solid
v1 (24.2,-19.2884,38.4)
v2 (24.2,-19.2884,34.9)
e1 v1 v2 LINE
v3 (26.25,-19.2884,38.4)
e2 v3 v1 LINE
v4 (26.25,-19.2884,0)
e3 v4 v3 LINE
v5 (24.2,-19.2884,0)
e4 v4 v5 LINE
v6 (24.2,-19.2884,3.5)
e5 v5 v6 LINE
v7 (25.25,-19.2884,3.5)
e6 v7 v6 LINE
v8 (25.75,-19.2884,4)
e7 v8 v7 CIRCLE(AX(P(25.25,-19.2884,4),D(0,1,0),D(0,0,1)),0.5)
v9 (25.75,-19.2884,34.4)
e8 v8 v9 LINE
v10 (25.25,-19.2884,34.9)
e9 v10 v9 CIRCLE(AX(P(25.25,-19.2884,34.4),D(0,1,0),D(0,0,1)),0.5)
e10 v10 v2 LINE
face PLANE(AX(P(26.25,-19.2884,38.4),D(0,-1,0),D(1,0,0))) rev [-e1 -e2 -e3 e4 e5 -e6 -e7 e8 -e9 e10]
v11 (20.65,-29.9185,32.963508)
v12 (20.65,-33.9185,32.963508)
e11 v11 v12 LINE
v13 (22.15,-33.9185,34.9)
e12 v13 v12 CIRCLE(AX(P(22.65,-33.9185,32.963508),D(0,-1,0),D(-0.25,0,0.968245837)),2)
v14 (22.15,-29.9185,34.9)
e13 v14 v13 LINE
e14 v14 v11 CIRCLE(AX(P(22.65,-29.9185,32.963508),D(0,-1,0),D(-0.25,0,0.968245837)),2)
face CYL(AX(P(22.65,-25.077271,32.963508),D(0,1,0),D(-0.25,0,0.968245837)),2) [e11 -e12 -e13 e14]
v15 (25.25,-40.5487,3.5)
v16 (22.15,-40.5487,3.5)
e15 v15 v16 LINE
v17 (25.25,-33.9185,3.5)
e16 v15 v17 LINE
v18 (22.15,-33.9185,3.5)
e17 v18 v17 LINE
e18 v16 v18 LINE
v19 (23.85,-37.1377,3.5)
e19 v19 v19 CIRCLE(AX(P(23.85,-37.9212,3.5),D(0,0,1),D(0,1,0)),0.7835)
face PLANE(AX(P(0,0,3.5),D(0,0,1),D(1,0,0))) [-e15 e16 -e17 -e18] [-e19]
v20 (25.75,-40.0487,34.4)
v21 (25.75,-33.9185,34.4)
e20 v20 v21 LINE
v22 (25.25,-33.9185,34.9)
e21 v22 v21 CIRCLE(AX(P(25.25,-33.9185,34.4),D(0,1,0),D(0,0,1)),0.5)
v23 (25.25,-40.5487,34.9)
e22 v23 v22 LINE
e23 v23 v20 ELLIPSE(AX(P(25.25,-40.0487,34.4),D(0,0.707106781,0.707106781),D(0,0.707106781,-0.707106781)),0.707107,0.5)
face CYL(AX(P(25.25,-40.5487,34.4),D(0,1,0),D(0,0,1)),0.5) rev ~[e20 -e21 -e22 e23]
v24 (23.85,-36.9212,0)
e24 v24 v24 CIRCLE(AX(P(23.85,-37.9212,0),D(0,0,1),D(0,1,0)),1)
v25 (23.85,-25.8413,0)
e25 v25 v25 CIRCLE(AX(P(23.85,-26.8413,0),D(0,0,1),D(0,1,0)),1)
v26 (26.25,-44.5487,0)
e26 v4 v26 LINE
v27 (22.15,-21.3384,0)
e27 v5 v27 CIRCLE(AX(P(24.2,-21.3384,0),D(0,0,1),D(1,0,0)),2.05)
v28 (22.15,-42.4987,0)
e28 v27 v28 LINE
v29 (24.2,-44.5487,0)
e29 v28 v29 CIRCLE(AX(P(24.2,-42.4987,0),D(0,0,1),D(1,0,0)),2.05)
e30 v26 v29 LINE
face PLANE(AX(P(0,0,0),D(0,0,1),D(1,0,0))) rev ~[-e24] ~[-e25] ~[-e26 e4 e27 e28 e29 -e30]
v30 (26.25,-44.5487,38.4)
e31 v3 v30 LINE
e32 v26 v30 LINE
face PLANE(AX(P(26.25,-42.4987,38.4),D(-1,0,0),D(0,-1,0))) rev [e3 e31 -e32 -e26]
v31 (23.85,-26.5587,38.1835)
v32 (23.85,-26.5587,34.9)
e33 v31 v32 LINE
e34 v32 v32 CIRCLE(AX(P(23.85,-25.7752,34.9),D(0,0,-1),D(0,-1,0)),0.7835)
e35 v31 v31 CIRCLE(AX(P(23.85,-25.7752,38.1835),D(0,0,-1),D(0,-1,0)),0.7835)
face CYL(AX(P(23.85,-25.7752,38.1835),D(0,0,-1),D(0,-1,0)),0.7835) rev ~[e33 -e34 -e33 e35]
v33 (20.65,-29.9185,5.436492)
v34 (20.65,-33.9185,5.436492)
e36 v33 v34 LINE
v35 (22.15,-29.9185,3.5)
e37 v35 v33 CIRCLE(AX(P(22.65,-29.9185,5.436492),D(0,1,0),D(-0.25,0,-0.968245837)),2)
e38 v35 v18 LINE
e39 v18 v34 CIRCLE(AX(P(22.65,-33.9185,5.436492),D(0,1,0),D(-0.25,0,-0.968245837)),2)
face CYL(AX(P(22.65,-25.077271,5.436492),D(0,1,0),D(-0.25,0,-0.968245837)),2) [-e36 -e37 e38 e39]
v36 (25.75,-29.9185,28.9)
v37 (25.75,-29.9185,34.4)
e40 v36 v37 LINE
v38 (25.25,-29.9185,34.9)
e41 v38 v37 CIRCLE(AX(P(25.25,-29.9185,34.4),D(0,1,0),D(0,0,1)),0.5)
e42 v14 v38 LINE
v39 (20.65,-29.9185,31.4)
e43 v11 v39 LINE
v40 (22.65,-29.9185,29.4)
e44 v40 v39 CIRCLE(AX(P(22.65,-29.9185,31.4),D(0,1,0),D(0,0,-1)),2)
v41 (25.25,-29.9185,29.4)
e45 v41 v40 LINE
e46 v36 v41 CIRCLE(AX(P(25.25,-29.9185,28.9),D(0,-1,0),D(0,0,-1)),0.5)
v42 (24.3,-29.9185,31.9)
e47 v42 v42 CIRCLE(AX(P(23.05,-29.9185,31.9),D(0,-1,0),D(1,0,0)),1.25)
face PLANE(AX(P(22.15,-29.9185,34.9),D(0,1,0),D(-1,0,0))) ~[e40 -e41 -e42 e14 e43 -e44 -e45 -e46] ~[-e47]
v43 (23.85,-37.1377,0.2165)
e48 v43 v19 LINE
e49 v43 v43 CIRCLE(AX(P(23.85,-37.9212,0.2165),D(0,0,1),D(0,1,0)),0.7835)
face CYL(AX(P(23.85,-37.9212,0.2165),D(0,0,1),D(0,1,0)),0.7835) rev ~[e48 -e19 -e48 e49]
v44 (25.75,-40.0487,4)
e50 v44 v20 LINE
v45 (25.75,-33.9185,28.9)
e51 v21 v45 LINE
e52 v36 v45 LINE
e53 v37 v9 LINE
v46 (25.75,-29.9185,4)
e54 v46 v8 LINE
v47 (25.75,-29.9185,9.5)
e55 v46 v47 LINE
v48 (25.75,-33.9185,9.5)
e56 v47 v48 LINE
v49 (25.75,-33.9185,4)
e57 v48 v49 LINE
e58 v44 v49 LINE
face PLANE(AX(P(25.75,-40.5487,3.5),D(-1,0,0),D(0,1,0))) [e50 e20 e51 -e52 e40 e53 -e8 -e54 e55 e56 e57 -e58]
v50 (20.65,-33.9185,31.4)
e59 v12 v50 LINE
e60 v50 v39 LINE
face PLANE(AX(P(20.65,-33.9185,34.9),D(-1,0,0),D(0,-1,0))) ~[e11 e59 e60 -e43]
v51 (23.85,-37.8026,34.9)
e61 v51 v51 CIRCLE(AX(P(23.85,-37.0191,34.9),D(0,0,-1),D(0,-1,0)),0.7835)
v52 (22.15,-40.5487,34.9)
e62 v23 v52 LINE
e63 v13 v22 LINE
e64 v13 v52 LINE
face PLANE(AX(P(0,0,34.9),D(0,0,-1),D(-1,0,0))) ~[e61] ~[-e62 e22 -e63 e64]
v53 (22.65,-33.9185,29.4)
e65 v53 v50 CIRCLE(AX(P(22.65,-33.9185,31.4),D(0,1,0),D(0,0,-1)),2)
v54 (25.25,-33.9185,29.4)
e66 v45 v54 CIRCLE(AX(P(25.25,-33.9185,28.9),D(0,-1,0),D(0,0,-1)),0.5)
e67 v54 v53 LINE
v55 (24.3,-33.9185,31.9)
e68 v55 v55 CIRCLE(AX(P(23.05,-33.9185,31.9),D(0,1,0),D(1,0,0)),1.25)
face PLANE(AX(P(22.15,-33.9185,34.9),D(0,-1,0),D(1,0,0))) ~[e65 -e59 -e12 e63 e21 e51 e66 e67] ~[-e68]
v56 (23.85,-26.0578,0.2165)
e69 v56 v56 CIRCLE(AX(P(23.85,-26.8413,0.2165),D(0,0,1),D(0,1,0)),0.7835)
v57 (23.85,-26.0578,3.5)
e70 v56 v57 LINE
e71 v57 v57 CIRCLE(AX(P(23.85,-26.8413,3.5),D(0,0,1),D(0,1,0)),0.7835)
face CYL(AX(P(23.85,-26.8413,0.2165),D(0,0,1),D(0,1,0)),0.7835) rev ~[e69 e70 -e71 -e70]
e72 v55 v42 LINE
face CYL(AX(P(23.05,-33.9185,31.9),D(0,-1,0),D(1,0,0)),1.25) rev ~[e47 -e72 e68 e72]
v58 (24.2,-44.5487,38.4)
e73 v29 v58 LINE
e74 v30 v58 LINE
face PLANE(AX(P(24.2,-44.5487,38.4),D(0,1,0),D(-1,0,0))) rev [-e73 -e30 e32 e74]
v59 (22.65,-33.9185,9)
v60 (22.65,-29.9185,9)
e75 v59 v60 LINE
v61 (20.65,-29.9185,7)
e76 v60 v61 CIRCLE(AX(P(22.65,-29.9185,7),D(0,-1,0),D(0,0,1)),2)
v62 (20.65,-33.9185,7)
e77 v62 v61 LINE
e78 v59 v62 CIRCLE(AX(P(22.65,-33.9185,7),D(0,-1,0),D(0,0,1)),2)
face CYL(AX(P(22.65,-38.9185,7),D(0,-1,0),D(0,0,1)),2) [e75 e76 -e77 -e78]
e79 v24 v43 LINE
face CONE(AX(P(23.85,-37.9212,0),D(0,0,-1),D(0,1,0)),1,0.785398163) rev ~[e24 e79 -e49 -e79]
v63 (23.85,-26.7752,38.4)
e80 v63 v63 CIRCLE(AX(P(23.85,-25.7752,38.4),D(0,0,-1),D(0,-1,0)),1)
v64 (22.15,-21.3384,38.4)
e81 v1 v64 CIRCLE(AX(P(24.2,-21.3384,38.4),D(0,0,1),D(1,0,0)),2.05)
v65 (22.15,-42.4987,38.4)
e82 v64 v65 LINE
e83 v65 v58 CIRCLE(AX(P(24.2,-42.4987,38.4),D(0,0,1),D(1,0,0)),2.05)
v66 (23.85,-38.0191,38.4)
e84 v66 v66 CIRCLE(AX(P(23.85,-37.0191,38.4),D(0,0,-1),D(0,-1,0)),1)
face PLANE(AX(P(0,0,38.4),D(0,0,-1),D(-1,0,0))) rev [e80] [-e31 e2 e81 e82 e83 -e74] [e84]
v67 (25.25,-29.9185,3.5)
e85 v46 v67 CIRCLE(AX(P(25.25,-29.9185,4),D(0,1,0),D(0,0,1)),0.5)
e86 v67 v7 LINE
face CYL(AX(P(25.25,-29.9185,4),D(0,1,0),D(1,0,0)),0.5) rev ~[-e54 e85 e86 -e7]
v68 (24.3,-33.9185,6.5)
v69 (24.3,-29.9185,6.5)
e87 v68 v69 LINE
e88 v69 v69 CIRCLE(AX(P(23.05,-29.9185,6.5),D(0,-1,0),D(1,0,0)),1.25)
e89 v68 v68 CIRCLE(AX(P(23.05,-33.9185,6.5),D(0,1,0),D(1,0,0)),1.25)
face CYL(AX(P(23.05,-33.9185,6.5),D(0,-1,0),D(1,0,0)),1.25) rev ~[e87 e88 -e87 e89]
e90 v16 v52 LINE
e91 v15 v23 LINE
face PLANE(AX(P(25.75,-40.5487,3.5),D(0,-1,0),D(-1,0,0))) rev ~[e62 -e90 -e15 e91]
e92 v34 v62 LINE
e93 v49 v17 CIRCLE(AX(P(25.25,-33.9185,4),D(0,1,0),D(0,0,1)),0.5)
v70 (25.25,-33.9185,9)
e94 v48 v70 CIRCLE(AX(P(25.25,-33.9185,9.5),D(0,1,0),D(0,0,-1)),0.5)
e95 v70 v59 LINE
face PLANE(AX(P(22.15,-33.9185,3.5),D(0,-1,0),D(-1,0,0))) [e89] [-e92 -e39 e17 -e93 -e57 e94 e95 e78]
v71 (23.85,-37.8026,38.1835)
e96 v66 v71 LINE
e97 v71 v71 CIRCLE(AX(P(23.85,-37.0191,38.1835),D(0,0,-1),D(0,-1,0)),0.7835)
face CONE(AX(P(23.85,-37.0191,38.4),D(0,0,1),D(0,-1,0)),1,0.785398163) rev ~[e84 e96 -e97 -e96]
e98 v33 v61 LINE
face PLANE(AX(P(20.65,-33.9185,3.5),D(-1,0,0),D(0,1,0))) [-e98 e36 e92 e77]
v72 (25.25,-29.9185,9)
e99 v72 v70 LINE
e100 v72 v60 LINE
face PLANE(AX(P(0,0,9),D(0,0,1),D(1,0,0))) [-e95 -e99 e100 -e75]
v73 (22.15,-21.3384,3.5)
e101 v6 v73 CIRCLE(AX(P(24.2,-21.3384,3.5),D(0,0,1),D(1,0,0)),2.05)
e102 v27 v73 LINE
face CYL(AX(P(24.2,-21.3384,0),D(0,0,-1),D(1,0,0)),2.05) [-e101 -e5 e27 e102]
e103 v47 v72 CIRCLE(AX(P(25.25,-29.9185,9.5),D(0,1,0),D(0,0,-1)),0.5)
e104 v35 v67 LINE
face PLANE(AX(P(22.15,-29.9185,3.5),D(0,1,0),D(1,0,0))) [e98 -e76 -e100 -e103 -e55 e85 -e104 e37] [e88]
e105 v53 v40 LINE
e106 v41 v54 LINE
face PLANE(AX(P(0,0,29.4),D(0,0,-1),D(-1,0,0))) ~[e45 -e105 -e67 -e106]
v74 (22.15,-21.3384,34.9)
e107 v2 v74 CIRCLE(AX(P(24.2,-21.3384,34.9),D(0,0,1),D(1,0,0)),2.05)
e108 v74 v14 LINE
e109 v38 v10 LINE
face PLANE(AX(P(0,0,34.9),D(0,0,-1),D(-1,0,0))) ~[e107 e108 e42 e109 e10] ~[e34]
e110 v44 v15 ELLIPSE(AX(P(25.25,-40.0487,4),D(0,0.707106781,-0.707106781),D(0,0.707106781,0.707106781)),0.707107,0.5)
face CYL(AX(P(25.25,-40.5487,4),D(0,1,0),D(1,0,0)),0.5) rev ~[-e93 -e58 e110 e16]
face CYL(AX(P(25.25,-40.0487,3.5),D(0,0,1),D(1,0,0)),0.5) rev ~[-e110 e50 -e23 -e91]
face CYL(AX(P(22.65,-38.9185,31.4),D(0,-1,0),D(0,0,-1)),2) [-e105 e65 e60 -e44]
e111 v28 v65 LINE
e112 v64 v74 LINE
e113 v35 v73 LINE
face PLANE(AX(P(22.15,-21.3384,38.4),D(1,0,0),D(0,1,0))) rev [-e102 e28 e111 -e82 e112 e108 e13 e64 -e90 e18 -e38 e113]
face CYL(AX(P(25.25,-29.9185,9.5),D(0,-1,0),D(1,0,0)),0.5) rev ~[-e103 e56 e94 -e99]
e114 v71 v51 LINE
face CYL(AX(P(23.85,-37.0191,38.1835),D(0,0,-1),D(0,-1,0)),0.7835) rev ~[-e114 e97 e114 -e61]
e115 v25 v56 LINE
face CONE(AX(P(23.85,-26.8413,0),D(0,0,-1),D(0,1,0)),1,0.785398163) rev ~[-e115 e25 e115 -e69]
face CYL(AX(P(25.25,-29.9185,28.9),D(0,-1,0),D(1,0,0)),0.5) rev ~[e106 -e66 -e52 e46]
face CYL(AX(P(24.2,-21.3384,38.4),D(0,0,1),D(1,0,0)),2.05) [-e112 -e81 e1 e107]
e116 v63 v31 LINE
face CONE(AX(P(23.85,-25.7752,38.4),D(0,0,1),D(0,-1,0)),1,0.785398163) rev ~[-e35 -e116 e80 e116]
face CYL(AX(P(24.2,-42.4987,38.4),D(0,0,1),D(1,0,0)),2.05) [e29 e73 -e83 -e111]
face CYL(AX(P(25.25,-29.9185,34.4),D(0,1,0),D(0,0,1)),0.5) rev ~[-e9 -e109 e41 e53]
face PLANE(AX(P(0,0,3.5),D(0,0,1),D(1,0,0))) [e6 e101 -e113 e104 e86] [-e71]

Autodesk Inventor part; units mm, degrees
ref_plane "YZ Plane" through (0, 0, 0) normal (1, 0, 0) x (0, 1, 0)
ref_plane "XZ Plane" through (0, 0, 0) normal (0, 1, 0) x (-1, 0, 0)
ref_plane "XY Plane" through (0, 0, 0) normal (0, 0, 1) x (1, 0, 0)
ref_plane "Work Plane1" through (0, 0, 0) normal (0, 0, 1) x (1, 0, 0)
sketch "Sketch1" plane through (0, 0, 0) normal (0, 0, 1) x (1, 0, 0)
  circle A0 centre (23.85, -37.9212) radius 0.7 projected
  circle A1 centre (23.85, -26.8413) radius 0.7 projected
  circle A2 centre (10.55, -52.3871) radius 14 projected
  circle A3 centre (10.55, -11.45) radius 14 projected
  line L0 (25.25, -34.8579) -> (25.25, -62.5871) projected
  line L1 (22.15, -44.5487) -> (26.25, -44.5487)
  line L2 (26.25, -44.5487) -> (26.25, -19.2884)
  line L3 (26.25, -19.2884) -> (22.15, -19.2884)
  line L4 (22.15, -19.2884) -> (22.15, -44.5487)
  circle A4 centre (24.2, -42.4987) radius 2.05
  circle A5 centre (24.2, -21.3384) radius 2.05
  point P0 (0, 0)
  point P1 (24.2, -19.2884)
  point P2 (22.15, -21.3384)
  point P3 (22.15, -42.4987)
  point P4 (24.2, -44.5487)
  dimension "d0" = 1
  dimension "d1" = 1
extrude "Extrusion1" add sketch "Sketch1" along normal blind 3.5 contours A0 | A1 | A4 L0 L1 | A4 L0 | L4 A5 L2 A4 | L0 A4 L2 L1 | L0 A4 | A5 | L3 L2 A5
sketch "Sketch2" plane through (0, 0, 3.5) normal (0, 0, 1) x (1, 0, 0)
  line L0 (22.25, -33.4185) -> (19.55, -33.4185) projected
  line L1 (22.25, -30.4185) -> (19.55, -30.4185) projected
  line L2 (26.25, -33.9066) -> (26.25, -41.9871) projected
  line L3 (26.25, -29.1685) -> (26.25, -34.6685) projected
  line L4 (26.25, -21.85) -> (26.25, -29.9304) projected
  line L5 (22.15, -21.3384) -> (22.15, -42.4987) projected
  line L6 (26.25, -33.9185) -> (20.65, -33.9185)
  line L7 (20.65, -33.9185) -> (20.65, -29.9185)
  line L8 (20.65, -29.9185) -> (26.25, -29.9185)
  line L9 (26.25, -29.9185) -> (26.25, -33.9185)
  point P0 (0, 0)
  dimension "d4" = 0.5
  dimension "d5" = 0.5
  dimension "d6" = 1.5
extrude "Extrusion2" add sketch "Sketch2" along normal blind 5.5
sketch "Sketch3" plane through (20.65, -33.9185, 3.5) normal (0, -1, 0) x (1, 0, 0)
  circle A0 centre (-2.1, 3) radius 1.25 projected
  line L0 (5.6, 0) -> (5.6, 5.5) projected
  circle A1 centre (2.4, 3) radius 1.25
  line L1 (2.4, 3) -> (-2.1, 3)
  circle A2 centre (2.4, 3) radius 2.5
  point P0 (-20.65, -3.5)
  dimension "d17" = 5
  dimension "d18" = 0.7
extrude "Extrusion3" cut sketch "Sketch3" against normal blind 11.5 contours A1
fillet "Fillet1" radius 2 2 edges at (20.65, -31.9185, 9) (20.65, -31.9185, 3.5)
ref_plane "Work Plane2" through (0, 0, 19.2) normal (0, 0, 1) x (1, 0, 0)
mirror "Mirror1" about plane through (0, 0, 19.2) normal (0, 0, 1) of "Extrusion1", "Extrusion2", "Extrusion3", "Fillet1"
sketch "Sketch4" plane through (0, 0, 3.5) normal (0, 0, 1) x (1, 0, 0)
  line L0 (26.25, -44.5487) -> (26.25, -19.2884) projected
  line L1 (24.2, -44.5487) -> (26.25, -44.5487) projected
  line L2 (26.25, -19.2884) -> (24.2, -19.2884) projected
  line L3 (25.75, -44.5487) -> (25.75, -19.2884)
  arc A0 (22.15, -42.4987) -> (24.2, -44.5487) centre (24.2, -42.4987) ccw projected
  line L4 (22.15, -21.3384) -> (22.15, -42.4987) projected
  arc A1 (24.2, -19.2884) -> (22.15, -21.3384) centre (24.2, -21.3384) ccw projected
  line L5 (25.75, -40.5487) -> (22.15, -40.5487)
  point P0 (0, 0)
  dimension "d14" = 0.5
  dimension "d20" = 4
extrude "Extrusion4" add sketch "Sketch4" along normal up to surface (31.4 mm away) contours L1 L3 L2 L0 | L1 A0 L4 L5 L3
fillet "Fillet2" radius 0.5 7 edges at (25.75, -37.2336, 3.5) (25.75, -24.6035, 3.5) (25.75, -37.2336, 34.9) (25.75, -24.6035, 34.9) (25.75, -40.5487, 19.2) (25.75, -31.9185, 9) (25.75, -31.9185, 29.4)
sketch "Sketch5" plane through (24.2, -19.2884, 38.4) normal (0, 0, 1) x (1, 0, 0)
  circle A0 centre (-0.35, -17.7307) radius 0.7 projected
  circle A1 centre (-0.35, -6.4868) radius 0.7 projected
  point P0 (-24.2, 19.2884)
hole "Hole1" at (23.85, -37.0191, 38.4) at (23.85, -25.7752, 38.4) direction (0, 0, -1) diameter 1.567 depth 6.3 countersink diameter 2 countersink angle 90 thread size "M2x0.4" class "6H" standard "ISO Metric profile"
sketch "Sketch6" plane through (0, 0, 0) normal (0, 0, -1) x (-1, 0, 0)
  circle A0 centre (-23.85, -26.8413) radius 0.7 projected
  circle A1 centre (-23.85, -37.9212) radius 0.7 projected
  point P0 (0, 0)
hole "Hole2" at (23.85, -26.8413, 0) at (23.85, -37.9212, 0) direction (0, 0, 1) diameter 1.567 depth 6.3 countersink diameter 2 countersink angle 90 thread size "M2x0.4" class "6H" standard "ISO Metric profile"
equation "\"d5\" = d4"
properties part number "DriverDownholdAlternate"
